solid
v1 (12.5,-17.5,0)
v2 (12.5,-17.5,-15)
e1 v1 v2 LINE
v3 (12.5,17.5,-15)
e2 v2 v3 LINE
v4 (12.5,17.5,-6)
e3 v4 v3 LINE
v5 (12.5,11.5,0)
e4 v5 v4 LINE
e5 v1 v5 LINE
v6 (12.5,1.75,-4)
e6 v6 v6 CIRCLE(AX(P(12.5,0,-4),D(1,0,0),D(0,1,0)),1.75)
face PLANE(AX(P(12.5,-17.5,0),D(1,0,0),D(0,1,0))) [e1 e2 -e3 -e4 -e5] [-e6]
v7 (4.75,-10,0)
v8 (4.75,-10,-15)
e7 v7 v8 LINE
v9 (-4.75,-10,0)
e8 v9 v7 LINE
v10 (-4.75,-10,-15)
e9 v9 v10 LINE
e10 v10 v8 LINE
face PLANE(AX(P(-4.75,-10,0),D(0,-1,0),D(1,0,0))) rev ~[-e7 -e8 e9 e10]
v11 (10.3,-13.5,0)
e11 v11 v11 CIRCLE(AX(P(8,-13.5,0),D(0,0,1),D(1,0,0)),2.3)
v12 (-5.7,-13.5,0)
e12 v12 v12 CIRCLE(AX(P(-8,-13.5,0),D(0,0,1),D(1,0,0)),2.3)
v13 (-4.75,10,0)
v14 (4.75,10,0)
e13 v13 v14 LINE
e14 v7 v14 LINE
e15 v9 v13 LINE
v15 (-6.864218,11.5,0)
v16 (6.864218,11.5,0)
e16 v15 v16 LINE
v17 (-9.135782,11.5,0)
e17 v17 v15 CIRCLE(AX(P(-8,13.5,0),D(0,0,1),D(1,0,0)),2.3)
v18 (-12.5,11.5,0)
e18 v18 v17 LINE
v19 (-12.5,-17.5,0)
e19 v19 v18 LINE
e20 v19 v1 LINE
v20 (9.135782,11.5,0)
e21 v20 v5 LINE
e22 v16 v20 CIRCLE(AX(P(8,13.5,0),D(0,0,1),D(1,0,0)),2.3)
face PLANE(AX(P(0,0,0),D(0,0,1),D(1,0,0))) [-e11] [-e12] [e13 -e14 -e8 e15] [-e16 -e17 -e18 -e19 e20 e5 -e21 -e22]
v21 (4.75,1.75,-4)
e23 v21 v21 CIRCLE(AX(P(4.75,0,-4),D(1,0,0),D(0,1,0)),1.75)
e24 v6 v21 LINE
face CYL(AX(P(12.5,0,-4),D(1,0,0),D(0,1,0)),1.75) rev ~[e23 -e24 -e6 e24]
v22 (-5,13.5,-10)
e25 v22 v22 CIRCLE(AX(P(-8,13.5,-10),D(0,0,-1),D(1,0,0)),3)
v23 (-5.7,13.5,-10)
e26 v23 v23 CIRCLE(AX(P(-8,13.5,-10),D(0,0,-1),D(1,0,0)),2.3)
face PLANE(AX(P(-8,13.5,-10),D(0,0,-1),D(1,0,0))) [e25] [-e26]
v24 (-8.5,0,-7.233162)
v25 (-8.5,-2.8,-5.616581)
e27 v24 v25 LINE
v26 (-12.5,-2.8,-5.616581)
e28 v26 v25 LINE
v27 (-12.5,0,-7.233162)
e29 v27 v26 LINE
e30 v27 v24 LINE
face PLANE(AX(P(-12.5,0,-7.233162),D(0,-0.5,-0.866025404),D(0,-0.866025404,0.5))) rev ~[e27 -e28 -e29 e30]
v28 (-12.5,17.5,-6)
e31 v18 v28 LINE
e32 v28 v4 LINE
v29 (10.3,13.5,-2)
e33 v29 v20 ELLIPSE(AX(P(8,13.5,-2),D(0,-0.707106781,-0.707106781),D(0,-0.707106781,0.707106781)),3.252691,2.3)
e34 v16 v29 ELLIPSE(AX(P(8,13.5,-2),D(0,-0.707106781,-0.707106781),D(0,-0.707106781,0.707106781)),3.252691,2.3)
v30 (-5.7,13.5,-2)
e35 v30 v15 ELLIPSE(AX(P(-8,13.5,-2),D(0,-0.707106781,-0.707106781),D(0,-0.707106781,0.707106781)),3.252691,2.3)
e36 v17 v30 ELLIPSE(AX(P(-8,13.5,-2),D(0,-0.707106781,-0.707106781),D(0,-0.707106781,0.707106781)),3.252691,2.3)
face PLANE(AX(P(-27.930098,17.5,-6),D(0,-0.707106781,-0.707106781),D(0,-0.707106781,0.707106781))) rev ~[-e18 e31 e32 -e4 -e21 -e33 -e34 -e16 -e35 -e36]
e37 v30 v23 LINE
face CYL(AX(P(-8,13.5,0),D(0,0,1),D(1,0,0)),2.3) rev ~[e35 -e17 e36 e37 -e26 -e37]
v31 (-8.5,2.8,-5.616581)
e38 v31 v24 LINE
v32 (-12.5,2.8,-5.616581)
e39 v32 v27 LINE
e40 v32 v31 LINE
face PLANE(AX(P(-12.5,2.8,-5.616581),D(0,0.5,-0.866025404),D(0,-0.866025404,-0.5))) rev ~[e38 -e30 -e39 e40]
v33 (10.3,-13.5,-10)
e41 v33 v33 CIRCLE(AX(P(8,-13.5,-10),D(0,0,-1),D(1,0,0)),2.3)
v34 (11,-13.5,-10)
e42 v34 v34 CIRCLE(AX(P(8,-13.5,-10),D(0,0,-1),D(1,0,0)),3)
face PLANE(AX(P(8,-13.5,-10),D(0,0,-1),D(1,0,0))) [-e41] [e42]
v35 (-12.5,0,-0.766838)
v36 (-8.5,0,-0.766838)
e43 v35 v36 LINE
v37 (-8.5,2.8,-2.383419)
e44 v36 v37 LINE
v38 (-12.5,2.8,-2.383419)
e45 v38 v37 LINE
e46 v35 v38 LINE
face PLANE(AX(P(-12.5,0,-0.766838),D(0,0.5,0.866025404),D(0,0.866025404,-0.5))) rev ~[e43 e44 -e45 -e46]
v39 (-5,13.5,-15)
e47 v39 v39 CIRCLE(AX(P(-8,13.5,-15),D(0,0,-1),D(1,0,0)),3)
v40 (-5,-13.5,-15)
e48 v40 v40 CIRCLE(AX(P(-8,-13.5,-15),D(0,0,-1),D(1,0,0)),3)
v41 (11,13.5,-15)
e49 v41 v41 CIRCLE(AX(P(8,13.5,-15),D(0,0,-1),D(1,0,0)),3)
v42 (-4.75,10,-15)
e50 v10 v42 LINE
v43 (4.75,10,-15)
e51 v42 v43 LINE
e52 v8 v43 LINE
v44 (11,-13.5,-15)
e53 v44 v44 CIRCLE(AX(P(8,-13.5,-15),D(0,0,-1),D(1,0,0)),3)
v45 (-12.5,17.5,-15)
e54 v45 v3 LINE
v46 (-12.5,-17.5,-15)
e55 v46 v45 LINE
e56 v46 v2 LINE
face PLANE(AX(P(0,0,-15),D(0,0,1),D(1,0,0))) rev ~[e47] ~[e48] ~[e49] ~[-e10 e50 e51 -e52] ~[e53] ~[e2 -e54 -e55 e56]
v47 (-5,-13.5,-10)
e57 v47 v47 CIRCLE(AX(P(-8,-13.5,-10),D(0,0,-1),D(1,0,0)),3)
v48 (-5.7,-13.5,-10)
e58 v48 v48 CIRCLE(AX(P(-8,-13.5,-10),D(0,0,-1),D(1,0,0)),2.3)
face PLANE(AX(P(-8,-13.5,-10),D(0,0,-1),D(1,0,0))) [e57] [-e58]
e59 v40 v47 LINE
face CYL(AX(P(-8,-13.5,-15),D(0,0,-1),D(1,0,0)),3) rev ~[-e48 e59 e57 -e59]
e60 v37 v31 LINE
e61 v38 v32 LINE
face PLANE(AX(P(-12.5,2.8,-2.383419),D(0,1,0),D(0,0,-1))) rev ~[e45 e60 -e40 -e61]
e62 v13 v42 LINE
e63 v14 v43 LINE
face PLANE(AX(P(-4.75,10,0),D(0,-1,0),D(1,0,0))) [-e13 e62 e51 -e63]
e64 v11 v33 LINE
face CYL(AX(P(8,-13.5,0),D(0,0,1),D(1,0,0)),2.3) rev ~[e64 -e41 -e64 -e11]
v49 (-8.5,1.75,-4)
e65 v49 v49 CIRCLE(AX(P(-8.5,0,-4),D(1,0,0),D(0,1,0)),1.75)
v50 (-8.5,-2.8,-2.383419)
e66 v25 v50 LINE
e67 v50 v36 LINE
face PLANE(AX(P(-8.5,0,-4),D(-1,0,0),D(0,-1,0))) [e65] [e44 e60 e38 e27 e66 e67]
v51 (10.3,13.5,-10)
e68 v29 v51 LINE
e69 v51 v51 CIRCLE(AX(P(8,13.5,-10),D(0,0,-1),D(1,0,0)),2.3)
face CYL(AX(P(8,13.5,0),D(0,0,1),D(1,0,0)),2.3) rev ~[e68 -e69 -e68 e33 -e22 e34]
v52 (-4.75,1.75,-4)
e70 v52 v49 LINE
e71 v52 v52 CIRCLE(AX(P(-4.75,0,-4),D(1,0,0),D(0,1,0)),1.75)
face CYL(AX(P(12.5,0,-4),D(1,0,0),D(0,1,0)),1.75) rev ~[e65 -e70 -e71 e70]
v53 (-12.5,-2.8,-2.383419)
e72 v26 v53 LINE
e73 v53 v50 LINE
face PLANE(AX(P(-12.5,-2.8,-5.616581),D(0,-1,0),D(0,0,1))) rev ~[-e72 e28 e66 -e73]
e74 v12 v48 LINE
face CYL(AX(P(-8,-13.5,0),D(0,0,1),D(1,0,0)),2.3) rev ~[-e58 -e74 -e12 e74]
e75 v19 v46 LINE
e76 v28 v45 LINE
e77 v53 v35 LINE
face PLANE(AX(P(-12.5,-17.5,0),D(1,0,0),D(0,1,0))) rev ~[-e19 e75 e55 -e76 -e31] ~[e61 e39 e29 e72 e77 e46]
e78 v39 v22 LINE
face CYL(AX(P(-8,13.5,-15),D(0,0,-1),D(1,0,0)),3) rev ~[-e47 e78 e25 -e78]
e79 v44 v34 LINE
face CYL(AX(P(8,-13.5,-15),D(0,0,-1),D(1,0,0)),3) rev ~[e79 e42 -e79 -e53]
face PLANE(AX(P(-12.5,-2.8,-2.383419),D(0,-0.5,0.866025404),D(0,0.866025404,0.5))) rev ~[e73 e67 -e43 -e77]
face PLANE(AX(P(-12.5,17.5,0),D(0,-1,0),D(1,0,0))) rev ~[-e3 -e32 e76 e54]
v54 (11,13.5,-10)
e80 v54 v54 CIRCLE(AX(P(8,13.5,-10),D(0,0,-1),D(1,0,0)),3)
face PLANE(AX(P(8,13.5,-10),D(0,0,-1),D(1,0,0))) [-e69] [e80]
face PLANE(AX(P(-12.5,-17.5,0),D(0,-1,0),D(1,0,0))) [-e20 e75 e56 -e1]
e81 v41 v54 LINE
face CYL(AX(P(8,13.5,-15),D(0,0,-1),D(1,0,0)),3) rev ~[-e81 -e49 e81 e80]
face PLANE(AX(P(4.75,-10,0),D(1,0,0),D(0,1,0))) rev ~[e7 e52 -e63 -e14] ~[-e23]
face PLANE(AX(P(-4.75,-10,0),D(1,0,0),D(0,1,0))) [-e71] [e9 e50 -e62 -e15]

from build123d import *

# Parameters (mm, degrees)
F0_W         = 25
F0_H         = 35
F1_DEPTH     = 15
F2_R         = 1.75
F3_DEPTH     = 25
F4_W         = 9.5
F4_H         = 20
F5_DEPTH     = 15
F6_R         = 1.75
F7_DEPTH     = 4
F8_R         = 2.3
F9_DEPTH     = 15
F10_R        = 3
F10_R_2      = 2.3
F11_DEPTH    = 5
F12_T1_DEPTH = 55.8601958556


# Not quite as in the source:
# - a fillet or chamfer that OpenCascade refuses, or shapes differently, is made with other operations: its cross-section is extruded or revolved along the edge and cut away or added


with BuildPart() as f1:
    # F0 (on Top) → F1 (new body)
    with BuildSketch(Plane.XY):
        Rectangle(F0_W, F0_H)
    extrude(amount=-F1_DEPTH)

    # F2 (on face) → F3 (cut)
    with BuildSketch(Plane.YZ.offset(12.5)):
        with Locations((0, -4)):
            Circle(F2_R)
    extrude(amount=-F3_DEPTH, mode=Mode.SUBTRACT)

    # F4 (on face) → F5 (cut)
    with BuildSketch(Plane.XY):
        Rectangle(F4_W, F4_H)
    extrude(amount=-F5_DEPTH, mode=Mode.SUBTRACT)

    # F6 (on face) → F7 (cut)
    with BuildSketch(Plane(origin=(-12.5, 0, 0), x_dir=(0, -1, 0), z_dir=(-1, 0, 0))):
        Polygon((-2.8, -2.3834192463), (-2.8, -5.6165807537), (0, -7.2331615075), (2.8, -5.6165807537), (2.8, -2.3834192463), (0, -0.7668384925), align=None)
        with Locations((0, -4)):
            Circle(F6_R, mode=Mode.SUBTRACT)
    extrude(amount=-F7_DEPTH, mode=Mode.SUBTRACT)

    # F8 (on face) → F9 (cut)
    with BuildSketch(Plane.XY):
        with Locations((-8, 13.5)):
            Circle(F8_R)
        with Locations((8, 13.5)):
            Circle(F8_R)
        with Locations((8, -13.5)):
            Circle(F8_R)
        with Locations((-8, -13.5)):
            Circle(F8_R)
    extrude(amount=-F9_DEPTH, mode=Mode.SUBTRACT)

    # F10 (on face) → F11 (cut)
    with BuildSketch(Plane(origin=(0, 0, -15), x_dir=(1, 0, 0), z_dir=(0, 0, -1))):
        with Locations((-8, 13.5)):
            Circle(F10_R)
        with Locations((-8, 13.5)):
            Circle(F10_R_2, mode=Mode.SUBTRACT)
        with Locations((8, 13.5)):
            Circle(F10_R)
        with Locations((8, 13.5)):
            Circle(F10_R_2, mode=Mode.SUBTRACT)
        with Locations((8, -13.5)):
            Circle(F10_R)
        with Locations((8, -13.5)):
            Circle(F10_R_2, mode=Mode.SUBTRACT)
        with Locations((-8, -13.5)):
            Circle(F10_R)
        with Locations((-8, -13.5)):
            Circle(F10_R_2, mode=Mode.SUBTRACT)
    extrude(amount=-F11_DEPTH, mode=Mode.SUBTRACT)

    # F12: chamfer of 6 on 1 edges, made by hand

    # F12_s2 → F12_t1 (cut)
    with BuildSketch(Plane.YZ.offset(-27.9300979278)):
        Polygon((17.5, -6), (11.5, 0), (17.5, 0), align=None)
    extrude(amount=F12_T1_DEPTH, mode=Mode.SUBTRACT)


solid = f1.part
